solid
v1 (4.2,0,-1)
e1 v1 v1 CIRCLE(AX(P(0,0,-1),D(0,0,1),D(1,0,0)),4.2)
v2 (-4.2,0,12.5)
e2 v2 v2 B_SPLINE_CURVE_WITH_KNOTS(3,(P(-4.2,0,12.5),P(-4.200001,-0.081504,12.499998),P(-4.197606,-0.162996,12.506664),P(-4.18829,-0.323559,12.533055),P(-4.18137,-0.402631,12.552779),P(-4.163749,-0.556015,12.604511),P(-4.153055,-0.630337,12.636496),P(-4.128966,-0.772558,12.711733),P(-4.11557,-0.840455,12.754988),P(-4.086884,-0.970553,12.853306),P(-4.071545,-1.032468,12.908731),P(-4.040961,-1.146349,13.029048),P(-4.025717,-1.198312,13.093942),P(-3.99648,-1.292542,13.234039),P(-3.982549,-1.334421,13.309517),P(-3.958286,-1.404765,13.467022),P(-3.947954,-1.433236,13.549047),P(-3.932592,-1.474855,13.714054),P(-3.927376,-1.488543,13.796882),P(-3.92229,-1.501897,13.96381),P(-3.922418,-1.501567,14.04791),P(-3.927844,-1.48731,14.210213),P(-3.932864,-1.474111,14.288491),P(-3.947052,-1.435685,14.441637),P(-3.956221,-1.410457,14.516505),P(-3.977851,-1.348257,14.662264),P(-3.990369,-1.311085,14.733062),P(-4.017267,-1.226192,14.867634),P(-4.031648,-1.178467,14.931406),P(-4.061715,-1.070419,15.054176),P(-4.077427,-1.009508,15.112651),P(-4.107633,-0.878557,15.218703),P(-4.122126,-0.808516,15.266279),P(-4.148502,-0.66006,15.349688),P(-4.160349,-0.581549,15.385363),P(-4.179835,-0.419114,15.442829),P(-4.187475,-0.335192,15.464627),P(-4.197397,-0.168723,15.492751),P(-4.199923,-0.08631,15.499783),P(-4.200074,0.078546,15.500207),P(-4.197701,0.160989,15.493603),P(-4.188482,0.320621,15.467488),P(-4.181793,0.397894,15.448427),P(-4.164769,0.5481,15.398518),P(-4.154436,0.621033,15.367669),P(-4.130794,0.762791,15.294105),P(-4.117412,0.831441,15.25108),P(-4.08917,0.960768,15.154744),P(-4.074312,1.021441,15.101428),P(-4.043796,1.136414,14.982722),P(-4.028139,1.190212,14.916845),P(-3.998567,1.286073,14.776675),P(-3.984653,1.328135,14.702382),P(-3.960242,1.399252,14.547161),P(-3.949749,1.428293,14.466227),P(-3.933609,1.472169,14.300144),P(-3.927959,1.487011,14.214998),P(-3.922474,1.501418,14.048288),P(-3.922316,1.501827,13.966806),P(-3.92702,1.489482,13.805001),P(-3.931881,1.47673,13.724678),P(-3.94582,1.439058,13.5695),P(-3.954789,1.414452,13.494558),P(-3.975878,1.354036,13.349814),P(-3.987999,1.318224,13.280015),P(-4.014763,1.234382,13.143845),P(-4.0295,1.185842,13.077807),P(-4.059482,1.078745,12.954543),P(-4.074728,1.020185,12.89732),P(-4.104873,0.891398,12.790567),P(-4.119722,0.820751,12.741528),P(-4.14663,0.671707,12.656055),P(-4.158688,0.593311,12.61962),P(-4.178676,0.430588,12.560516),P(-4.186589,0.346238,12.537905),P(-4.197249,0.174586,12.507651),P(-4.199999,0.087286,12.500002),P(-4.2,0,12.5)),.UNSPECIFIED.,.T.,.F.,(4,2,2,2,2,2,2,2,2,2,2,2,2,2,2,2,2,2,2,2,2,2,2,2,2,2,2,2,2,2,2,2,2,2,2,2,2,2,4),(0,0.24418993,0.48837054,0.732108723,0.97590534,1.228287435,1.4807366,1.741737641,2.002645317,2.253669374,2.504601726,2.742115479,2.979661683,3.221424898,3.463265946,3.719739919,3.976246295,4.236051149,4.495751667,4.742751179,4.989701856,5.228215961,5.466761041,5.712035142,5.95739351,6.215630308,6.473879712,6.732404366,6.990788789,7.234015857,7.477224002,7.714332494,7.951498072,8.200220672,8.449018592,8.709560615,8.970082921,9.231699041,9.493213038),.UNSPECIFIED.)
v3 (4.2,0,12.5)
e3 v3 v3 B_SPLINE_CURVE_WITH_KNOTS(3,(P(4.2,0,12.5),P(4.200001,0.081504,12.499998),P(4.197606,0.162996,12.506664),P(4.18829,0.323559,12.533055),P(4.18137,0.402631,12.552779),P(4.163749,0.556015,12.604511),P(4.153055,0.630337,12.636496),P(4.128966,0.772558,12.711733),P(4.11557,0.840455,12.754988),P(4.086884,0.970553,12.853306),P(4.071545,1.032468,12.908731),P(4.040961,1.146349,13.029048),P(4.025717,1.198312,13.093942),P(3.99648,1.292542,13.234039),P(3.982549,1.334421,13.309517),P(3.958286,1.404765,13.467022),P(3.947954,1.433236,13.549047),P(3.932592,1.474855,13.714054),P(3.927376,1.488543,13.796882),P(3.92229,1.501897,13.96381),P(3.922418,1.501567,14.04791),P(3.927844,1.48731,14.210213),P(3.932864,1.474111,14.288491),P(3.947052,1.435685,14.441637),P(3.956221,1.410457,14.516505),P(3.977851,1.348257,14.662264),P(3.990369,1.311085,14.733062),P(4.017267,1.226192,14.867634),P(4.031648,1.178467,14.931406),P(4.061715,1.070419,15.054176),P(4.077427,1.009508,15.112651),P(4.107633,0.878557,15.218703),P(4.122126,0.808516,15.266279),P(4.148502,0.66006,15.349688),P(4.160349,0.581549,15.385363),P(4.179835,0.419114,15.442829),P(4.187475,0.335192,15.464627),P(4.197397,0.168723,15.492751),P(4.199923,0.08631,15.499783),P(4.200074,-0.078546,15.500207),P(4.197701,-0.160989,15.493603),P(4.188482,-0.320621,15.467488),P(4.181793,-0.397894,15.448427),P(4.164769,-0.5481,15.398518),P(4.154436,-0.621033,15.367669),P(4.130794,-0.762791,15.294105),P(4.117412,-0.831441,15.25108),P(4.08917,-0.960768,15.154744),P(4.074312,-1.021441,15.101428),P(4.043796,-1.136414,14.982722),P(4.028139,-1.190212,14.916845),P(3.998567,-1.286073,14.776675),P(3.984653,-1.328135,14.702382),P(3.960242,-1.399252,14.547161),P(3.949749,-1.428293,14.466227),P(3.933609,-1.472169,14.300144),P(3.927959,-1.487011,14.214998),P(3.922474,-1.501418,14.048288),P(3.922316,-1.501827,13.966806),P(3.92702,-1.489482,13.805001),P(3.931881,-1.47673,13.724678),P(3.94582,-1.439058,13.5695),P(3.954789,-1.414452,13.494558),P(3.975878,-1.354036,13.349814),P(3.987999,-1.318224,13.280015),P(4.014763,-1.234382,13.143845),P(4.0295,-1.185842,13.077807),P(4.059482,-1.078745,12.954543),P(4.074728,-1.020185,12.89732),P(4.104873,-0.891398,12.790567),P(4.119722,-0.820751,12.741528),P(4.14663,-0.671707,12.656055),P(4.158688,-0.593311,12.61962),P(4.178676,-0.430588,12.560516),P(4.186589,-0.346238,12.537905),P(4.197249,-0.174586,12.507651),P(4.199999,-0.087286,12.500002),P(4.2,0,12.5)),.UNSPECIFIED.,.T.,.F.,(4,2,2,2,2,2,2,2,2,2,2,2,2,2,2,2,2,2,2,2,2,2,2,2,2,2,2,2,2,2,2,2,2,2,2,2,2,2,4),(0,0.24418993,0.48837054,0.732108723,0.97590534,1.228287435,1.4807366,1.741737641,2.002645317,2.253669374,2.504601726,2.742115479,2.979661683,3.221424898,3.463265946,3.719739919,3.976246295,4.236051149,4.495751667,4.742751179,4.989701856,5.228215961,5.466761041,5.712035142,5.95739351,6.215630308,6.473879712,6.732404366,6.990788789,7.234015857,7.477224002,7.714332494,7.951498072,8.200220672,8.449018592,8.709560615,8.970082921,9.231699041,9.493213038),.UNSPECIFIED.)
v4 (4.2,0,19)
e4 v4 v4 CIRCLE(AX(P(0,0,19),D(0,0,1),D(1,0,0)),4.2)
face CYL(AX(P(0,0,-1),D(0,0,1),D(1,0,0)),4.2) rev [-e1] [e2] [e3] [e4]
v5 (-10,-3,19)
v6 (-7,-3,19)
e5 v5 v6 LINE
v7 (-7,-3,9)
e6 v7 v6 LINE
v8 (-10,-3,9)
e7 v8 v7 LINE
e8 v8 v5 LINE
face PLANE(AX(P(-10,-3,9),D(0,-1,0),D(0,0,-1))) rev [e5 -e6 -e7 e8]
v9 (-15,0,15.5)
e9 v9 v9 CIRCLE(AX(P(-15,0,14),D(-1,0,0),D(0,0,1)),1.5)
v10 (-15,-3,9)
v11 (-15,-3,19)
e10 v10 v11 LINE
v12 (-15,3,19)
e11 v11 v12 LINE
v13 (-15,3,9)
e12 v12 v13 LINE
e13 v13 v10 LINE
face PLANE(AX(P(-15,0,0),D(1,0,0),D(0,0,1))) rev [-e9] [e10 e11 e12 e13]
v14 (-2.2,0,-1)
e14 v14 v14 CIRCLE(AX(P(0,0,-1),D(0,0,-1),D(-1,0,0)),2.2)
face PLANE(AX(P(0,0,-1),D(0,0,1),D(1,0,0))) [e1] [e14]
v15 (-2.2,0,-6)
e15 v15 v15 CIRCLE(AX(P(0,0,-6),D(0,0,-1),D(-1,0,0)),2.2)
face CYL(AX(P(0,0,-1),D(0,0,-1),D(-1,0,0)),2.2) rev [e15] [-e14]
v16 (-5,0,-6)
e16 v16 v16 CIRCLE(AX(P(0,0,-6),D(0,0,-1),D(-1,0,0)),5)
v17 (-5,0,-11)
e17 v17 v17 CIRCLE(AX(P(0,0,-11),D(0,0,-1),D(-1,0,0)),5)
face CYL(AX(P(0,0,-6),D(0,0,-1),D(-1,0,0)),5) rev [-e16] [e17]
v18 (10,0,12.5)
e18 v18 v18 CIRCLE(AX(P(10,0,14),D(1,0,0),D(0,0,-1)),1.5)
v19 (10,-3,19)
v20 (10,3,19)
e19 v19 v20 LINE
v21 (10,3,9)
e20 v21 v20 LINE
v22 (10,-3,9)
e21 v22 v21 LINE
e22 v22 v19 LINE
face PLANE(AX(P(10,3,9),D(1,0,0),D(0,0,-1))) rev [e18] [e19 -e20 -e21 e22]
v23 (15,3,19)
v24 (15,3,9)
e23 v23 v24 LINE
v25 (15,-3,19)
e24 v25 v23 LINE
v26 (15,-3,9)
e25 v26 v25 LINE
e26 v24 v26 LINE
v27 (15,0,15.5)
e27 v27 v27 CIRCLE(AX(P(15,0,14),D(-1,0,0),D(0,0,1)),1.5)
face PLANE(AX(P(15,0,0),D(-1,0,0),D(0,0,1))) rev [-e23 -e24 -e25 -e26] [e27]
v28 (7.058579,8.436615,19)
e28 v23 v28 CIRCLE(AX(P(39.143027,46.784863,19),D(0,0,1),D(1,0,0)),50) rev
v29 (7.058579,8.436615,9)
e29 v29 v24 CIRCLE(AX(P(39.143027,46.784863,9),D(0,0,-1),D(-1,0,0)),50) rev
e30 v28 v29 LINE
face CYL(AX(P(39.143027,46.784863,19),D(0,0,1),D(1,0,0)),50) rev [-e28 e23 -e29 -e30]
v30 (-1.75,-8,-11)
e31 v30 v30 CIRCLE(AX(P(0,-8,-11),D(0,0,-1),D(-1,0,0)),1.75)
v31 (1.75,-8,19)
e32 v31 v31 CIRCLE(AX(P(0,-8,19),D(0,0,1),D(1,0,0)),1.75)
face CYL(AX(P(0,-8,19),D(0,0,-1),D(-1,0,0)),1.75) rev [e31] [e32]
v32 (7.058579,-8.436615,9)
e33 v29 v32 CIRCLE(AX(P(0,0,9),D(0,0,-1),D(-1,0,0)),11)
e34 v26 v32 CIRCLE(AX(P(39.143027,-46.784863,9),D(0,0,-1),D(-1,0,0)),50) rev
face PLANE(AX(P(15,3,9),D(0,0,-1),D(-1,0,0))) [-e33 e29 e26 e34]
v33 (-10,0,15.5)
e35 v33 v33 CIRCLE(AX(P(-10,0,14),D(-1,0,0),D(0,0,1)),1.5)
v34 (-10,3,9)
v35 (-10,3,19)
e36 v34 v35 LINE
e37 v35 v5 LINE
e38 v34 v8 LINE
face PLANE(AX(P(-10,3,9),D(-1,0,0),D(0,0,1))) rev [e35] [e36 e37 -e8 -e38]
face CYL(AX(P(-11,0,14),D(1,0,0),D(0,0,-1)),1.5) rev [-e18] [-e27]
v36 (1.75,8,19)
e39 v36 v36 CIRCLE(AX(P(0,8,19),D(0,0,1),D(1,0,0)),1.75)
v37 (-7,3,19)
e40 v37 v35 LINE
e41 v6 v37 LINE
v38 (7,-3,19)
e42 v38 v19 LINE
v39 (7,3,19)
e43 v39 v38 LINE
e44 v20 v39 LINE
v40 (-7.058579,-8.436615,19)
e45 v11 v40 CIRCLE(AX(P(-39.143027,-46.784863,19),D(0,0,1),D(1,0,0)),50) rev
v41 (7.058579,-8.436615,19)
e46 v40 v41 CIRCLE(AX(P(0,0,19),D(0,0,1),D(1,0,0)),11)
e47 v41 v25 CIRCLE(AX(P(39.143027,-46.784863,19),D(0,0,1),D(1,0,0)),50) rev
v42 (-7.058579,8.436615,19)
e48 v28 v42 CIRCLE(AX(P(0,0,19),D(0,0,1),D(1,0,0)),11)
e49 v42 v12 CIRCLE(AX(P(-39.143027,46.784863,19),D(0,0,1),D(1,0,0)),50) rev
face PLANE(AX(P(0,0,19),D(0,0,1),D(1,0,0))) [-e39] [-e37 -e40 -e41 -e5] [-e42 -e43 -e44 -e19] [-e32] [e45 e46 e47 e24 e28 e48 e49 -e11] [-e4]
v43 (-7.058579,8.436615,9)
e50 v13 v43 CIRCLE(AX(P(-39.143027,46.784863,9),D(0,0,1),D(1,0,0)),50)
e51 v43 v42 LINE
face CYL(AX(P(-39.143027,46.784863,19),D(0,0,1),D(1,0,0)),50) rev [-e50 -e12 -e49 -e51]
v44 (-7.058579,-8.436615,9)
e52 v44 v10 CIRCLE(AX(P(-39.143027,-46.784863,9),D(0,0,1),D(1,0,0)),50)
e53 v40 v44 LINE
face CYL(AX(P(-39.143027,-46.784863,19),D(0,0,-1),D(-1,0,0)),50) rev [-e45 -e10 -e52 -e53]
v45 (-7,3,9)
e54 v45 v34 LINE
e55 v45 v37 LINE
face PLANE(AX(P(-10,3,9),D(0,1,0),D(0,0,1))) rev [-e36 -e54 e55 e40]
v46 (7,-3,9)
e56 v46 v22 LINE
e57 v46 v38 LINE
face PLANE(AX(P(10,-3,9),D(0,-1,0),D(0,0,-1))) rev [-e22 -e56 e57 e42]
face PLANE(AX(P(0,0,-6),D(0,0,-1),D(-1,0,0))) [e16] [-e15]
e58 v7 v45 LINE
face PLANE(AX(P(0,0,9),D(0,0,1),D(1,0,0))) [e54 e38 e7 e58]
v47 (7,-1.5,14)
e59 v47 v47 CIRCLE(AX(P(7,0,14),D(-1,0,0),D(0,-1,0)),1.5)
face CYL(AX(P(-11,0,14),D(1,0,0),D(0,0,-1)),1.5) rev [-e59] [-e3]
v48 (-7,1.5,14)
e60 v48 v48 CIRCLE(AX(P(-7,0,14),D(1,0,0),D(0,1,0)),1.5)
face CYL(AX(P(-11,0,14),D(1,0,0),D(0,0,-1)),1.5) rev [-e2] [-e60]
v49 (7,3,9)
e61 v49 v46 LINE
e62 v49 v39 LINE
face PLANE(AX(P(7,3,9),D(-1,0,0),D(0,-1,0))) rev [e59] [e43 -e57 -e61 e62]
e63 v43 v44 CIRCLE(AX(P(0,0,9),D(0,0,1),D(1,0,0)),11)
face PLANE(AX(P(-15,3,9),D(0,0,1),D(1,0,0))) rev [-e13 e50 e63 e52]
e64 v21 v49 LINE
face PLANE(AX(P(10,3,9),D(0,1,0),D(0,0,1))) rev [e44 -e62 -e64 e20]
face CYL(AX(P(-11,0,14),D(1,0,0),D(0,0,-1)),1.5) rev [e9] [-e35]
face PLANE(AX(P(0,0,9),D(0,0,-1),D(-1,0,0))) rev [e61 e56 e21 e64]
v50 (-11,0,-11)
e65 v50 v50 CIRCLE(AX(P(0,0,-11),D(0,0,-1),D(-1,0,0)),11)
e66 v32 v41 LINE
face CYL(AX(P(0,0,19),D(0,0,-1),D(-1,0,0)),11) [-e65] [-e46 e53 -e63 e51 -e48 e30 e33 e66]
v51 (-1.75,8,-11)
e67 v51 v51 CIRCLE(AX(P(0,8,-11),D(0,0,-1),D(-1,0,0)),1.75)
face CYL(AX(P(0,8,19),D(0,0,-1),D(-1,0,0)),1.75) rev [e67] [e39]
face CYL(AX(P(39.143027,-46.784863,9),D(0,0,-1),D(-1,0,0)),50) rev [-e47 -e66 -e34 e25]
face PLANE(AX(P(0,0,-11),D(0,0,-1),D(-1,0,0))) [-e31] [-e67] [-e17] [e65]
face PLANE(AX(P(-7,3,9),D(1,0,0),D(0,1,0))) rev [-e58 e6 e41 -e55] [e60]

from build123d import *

# Parameters (mm, degrees)
SKETCH1_R               = 11
SKETCH1_R_2             = 1.75
BOSS_EXTRUDE1_DEPTH     = 19
BOSS_EXTRUDE2_START     = 11
SKETCH2_R               = 11
SKETCH2_R_2             = 1.75
BOSS_EXTRUDE2_DEPTH     = 11
CUT_EXTRUDE3_DEPTH      = 20
SKETCH7_R               = 5
CUT_EXTRUDE4_DEPTH      = 5
SKETCH8_R               = 2.2
CUT_EXTRUDE5_DEPTH      = 5
BOSS_EXTRUDE3_DEPTH     = 20
SKETCH11_W              = 3
SKETCH11_H              = 6
CUT_EXTRUDE6_DEPTH      = 10
CUT_EXTRUDE7_DEPTH      = 25.556058316
CUT_EXTRUDE7_DEPTH_BACK = 25.556058316
SKETCH12_R              = 1.5
SKETCH13_W              = 10
SKETCH13_H              = 6
SKETCH13_R              = 1.5
BOSS_EXTRUDE4_DEPTH     = 5
FILLET1_R               = 50


with BuildPart() as part:
    # Sketch1 → Boss-Extrude1 (new body)
    with BuildSketch(Plane.XY):
        Circle(SKETCH1_R)
        with Locations((0, 8)):
            Circle(SKETCH1_R_2, mode=Mode.SUBTRACT)
        with Locations((0, -8)):
            Circle(SKETCH1_R_2, mode=Mode.SUBTRACT)
    extrude(amount=BOSS_EXTRUDE1_DEPTH)

    # Sketch2 → Boss-Extrude2 (add)
    with BuildSketch(Plane(origin=(0, 0, 0), x_dir=(-1, 0, 0), z_dir=(0, 0, -1)).offset(BOSS_EXTRUDE2_START)):
        Circle(SKETCH2_R)
        with Locations((0, 8)):
            Circle(SKETCH2_R_2, mode=Mode.SUBTRACT)
        with Locations((0, -8)):
            Circle(SKETCH2_R_2, mode=Mode.SUBTRACT)
    extrude(amount=-BOSS_EXTRUDE2_DEPTH)

    # Sketch6 → Cut-Extrude3 (cut)
    with BuildSketch(Plane.XY.offset(19)):
        with BuildLine():
            Line((-4.079215611, 1), (-5, 1))
            Line((-5, 1), (-5, -1))
            Line((-5, -1), (-4.079215611, -1))
            ThreePointArc((-4.079215611, -1), (4.2, 0), (-4.079215611, 1))
        make_face()
    extrude(amount=-CUT_EXTRUDE3_DEPTH, mode=Mode.SUBTRACT)

    # Sketch7 → Cut-Extrude4 (cut)
    with BuildSketch(Plane(origin=(0, 0, -11), x_dir=(-1, 0, 0), z_dir=(0, 0, -1))):
        Circle(SKETCH7_R)
    extrude(amount=-CUT_EXTRUDE4_DEPTH, mode=Mode.SUBTRACT)

    # Sketch8 → Cut-Extrude5 (cut)
    with BuildSketch(Plane(origin=(0, 0, -6), x_dir=(-1, 0, 0), z_dir=(0, 0, -1))):
        Circle(SKETCH8_R)
    extrude(amount=-CUT_EXTRUDE5_DEPTH, mode=Mode.SUBTRACT)

    # Sketch9 → Boss-Extrude3 (add)
    with BuildSketch(Plane.XY.offset(19)):
        with BuildLine():
            Line((-5, -1), (-4.079215611, -1))
            ThreePointArc((-4.079215611, -1), (-4.2, 0), (-4.079215611, 1))
            Line((-4.079215611, 1), (-5, 1))
            Line((-5, 1), (-5, -1))
        make_face()
    extrude(amount=-BOSS_EXTRUDE3_DEPTH)

    # Sketch11 → Cut-Extrude6 (cut)
    with BuildSketch(Plane.XY.offset(19)):
        with Locations((-8.5, 0)):
            Rectangle(SKETCH11_W, SKETCH11_H)
        with Locations((8.5, 0)):
            Rectangle(SKETCH11_W, SKETCH11_H)
    extrude(amount=-CUT_EXTRUDE6_DEPTH, mode=Mode.SUBTRACT)

    # Sketch12 → Cut-Extrude7 (cut, two sides: drawn at the far end of the back side and taken through both)
    with BuildSketch(Plane(origin=(0, 0, 0), x_dir=(0, 0, -1), z_dir=(1, 0, 0)).offset(-CUT_EXTRUDE7_DEPTH_BACK)):
        with Locations((-14, 0)):
            Circle(SKETCH12_R)
    extrude(amount=CUT_EXTRUDE7_DEPTH + CUT_EXTRUDE7_DEPTH_BACK, mode=Mode.SUBTRACT)

    # Sketch13 → Boss-Extrude4 (add)
    with BuildSketch(Plane.ZY.offset(-10)):
        with Locations((14, 0)):
            Rectangle(SKETCH13_W, SKETCH13_H)
        with Locations(Location((14, 0, 0), (0, 0, 180))):
            Circle(SKETCH13_R, mode=Mode.SUBTRACT)
    boss_extrude4 = extrude(amount=-BOSS_EXTRUDE4_DEPTH)

    # Mirror1: Boss-Extrude4 across plane
    add(boss_extrude4.mirror(Plane(origin=(0, 0, 0), x_dir=(0, 0, 1), z_dir=(1, 0, 0))))

    # Fillet1
    # the kernel refuses this fillet: 50 mm, written as the material it adds along each edge
    with BuildSketch(Plane(origin=(-10.583005244, -3, 19), x_dir=(0.5439709687724876, -0.8391040371328942, 0), z_dir=(0, 0, -1)), Plane(origin=(10.583005244, 3, 19), x_dir=(-0.5439709687724888, 0.8391040371328933, 0), z_dir=(0, 0, -1))) as fillet1_piece_1:
        with BuildLine():
            CenterArc((21.204232389, 47.782524235), FILLET1_R, 241.826767434, 11.045481443)
            Line((-2.402716916, 3.706318132), (0, 0))
            ThreePointArc((0, 0), (3.239535504, 0.487844668), (6.479071008, 0))
        make_face()
    extrude(amount=10)
    with BuildSketch(Plane(origin=(-10.583005244, 3, 19), x_dir=(0.5439709687724879, 0.839104037132894, 0), z_dir=(0, 0, -1)), Plane(origin=(10.583005244, -3, 19), x_dir=(-0.5439709687724888, -0.8391040371328933, 0), z_dir=(0, 0, -1))) as fillet1_piece_2:
        with BuildLine():
            CenterArc((21.204232389, -47.782524235), FILLET1_R, 107.127751124, 11.045481443)
            Line((-2.402716916, -3.706318132), (0, 0))
            ThreePointArc((0, 0), (3.239535504, -0.487844668), (6.479071008, 0))
        make_face()
    extrude(amount=10)


solid = part.part
